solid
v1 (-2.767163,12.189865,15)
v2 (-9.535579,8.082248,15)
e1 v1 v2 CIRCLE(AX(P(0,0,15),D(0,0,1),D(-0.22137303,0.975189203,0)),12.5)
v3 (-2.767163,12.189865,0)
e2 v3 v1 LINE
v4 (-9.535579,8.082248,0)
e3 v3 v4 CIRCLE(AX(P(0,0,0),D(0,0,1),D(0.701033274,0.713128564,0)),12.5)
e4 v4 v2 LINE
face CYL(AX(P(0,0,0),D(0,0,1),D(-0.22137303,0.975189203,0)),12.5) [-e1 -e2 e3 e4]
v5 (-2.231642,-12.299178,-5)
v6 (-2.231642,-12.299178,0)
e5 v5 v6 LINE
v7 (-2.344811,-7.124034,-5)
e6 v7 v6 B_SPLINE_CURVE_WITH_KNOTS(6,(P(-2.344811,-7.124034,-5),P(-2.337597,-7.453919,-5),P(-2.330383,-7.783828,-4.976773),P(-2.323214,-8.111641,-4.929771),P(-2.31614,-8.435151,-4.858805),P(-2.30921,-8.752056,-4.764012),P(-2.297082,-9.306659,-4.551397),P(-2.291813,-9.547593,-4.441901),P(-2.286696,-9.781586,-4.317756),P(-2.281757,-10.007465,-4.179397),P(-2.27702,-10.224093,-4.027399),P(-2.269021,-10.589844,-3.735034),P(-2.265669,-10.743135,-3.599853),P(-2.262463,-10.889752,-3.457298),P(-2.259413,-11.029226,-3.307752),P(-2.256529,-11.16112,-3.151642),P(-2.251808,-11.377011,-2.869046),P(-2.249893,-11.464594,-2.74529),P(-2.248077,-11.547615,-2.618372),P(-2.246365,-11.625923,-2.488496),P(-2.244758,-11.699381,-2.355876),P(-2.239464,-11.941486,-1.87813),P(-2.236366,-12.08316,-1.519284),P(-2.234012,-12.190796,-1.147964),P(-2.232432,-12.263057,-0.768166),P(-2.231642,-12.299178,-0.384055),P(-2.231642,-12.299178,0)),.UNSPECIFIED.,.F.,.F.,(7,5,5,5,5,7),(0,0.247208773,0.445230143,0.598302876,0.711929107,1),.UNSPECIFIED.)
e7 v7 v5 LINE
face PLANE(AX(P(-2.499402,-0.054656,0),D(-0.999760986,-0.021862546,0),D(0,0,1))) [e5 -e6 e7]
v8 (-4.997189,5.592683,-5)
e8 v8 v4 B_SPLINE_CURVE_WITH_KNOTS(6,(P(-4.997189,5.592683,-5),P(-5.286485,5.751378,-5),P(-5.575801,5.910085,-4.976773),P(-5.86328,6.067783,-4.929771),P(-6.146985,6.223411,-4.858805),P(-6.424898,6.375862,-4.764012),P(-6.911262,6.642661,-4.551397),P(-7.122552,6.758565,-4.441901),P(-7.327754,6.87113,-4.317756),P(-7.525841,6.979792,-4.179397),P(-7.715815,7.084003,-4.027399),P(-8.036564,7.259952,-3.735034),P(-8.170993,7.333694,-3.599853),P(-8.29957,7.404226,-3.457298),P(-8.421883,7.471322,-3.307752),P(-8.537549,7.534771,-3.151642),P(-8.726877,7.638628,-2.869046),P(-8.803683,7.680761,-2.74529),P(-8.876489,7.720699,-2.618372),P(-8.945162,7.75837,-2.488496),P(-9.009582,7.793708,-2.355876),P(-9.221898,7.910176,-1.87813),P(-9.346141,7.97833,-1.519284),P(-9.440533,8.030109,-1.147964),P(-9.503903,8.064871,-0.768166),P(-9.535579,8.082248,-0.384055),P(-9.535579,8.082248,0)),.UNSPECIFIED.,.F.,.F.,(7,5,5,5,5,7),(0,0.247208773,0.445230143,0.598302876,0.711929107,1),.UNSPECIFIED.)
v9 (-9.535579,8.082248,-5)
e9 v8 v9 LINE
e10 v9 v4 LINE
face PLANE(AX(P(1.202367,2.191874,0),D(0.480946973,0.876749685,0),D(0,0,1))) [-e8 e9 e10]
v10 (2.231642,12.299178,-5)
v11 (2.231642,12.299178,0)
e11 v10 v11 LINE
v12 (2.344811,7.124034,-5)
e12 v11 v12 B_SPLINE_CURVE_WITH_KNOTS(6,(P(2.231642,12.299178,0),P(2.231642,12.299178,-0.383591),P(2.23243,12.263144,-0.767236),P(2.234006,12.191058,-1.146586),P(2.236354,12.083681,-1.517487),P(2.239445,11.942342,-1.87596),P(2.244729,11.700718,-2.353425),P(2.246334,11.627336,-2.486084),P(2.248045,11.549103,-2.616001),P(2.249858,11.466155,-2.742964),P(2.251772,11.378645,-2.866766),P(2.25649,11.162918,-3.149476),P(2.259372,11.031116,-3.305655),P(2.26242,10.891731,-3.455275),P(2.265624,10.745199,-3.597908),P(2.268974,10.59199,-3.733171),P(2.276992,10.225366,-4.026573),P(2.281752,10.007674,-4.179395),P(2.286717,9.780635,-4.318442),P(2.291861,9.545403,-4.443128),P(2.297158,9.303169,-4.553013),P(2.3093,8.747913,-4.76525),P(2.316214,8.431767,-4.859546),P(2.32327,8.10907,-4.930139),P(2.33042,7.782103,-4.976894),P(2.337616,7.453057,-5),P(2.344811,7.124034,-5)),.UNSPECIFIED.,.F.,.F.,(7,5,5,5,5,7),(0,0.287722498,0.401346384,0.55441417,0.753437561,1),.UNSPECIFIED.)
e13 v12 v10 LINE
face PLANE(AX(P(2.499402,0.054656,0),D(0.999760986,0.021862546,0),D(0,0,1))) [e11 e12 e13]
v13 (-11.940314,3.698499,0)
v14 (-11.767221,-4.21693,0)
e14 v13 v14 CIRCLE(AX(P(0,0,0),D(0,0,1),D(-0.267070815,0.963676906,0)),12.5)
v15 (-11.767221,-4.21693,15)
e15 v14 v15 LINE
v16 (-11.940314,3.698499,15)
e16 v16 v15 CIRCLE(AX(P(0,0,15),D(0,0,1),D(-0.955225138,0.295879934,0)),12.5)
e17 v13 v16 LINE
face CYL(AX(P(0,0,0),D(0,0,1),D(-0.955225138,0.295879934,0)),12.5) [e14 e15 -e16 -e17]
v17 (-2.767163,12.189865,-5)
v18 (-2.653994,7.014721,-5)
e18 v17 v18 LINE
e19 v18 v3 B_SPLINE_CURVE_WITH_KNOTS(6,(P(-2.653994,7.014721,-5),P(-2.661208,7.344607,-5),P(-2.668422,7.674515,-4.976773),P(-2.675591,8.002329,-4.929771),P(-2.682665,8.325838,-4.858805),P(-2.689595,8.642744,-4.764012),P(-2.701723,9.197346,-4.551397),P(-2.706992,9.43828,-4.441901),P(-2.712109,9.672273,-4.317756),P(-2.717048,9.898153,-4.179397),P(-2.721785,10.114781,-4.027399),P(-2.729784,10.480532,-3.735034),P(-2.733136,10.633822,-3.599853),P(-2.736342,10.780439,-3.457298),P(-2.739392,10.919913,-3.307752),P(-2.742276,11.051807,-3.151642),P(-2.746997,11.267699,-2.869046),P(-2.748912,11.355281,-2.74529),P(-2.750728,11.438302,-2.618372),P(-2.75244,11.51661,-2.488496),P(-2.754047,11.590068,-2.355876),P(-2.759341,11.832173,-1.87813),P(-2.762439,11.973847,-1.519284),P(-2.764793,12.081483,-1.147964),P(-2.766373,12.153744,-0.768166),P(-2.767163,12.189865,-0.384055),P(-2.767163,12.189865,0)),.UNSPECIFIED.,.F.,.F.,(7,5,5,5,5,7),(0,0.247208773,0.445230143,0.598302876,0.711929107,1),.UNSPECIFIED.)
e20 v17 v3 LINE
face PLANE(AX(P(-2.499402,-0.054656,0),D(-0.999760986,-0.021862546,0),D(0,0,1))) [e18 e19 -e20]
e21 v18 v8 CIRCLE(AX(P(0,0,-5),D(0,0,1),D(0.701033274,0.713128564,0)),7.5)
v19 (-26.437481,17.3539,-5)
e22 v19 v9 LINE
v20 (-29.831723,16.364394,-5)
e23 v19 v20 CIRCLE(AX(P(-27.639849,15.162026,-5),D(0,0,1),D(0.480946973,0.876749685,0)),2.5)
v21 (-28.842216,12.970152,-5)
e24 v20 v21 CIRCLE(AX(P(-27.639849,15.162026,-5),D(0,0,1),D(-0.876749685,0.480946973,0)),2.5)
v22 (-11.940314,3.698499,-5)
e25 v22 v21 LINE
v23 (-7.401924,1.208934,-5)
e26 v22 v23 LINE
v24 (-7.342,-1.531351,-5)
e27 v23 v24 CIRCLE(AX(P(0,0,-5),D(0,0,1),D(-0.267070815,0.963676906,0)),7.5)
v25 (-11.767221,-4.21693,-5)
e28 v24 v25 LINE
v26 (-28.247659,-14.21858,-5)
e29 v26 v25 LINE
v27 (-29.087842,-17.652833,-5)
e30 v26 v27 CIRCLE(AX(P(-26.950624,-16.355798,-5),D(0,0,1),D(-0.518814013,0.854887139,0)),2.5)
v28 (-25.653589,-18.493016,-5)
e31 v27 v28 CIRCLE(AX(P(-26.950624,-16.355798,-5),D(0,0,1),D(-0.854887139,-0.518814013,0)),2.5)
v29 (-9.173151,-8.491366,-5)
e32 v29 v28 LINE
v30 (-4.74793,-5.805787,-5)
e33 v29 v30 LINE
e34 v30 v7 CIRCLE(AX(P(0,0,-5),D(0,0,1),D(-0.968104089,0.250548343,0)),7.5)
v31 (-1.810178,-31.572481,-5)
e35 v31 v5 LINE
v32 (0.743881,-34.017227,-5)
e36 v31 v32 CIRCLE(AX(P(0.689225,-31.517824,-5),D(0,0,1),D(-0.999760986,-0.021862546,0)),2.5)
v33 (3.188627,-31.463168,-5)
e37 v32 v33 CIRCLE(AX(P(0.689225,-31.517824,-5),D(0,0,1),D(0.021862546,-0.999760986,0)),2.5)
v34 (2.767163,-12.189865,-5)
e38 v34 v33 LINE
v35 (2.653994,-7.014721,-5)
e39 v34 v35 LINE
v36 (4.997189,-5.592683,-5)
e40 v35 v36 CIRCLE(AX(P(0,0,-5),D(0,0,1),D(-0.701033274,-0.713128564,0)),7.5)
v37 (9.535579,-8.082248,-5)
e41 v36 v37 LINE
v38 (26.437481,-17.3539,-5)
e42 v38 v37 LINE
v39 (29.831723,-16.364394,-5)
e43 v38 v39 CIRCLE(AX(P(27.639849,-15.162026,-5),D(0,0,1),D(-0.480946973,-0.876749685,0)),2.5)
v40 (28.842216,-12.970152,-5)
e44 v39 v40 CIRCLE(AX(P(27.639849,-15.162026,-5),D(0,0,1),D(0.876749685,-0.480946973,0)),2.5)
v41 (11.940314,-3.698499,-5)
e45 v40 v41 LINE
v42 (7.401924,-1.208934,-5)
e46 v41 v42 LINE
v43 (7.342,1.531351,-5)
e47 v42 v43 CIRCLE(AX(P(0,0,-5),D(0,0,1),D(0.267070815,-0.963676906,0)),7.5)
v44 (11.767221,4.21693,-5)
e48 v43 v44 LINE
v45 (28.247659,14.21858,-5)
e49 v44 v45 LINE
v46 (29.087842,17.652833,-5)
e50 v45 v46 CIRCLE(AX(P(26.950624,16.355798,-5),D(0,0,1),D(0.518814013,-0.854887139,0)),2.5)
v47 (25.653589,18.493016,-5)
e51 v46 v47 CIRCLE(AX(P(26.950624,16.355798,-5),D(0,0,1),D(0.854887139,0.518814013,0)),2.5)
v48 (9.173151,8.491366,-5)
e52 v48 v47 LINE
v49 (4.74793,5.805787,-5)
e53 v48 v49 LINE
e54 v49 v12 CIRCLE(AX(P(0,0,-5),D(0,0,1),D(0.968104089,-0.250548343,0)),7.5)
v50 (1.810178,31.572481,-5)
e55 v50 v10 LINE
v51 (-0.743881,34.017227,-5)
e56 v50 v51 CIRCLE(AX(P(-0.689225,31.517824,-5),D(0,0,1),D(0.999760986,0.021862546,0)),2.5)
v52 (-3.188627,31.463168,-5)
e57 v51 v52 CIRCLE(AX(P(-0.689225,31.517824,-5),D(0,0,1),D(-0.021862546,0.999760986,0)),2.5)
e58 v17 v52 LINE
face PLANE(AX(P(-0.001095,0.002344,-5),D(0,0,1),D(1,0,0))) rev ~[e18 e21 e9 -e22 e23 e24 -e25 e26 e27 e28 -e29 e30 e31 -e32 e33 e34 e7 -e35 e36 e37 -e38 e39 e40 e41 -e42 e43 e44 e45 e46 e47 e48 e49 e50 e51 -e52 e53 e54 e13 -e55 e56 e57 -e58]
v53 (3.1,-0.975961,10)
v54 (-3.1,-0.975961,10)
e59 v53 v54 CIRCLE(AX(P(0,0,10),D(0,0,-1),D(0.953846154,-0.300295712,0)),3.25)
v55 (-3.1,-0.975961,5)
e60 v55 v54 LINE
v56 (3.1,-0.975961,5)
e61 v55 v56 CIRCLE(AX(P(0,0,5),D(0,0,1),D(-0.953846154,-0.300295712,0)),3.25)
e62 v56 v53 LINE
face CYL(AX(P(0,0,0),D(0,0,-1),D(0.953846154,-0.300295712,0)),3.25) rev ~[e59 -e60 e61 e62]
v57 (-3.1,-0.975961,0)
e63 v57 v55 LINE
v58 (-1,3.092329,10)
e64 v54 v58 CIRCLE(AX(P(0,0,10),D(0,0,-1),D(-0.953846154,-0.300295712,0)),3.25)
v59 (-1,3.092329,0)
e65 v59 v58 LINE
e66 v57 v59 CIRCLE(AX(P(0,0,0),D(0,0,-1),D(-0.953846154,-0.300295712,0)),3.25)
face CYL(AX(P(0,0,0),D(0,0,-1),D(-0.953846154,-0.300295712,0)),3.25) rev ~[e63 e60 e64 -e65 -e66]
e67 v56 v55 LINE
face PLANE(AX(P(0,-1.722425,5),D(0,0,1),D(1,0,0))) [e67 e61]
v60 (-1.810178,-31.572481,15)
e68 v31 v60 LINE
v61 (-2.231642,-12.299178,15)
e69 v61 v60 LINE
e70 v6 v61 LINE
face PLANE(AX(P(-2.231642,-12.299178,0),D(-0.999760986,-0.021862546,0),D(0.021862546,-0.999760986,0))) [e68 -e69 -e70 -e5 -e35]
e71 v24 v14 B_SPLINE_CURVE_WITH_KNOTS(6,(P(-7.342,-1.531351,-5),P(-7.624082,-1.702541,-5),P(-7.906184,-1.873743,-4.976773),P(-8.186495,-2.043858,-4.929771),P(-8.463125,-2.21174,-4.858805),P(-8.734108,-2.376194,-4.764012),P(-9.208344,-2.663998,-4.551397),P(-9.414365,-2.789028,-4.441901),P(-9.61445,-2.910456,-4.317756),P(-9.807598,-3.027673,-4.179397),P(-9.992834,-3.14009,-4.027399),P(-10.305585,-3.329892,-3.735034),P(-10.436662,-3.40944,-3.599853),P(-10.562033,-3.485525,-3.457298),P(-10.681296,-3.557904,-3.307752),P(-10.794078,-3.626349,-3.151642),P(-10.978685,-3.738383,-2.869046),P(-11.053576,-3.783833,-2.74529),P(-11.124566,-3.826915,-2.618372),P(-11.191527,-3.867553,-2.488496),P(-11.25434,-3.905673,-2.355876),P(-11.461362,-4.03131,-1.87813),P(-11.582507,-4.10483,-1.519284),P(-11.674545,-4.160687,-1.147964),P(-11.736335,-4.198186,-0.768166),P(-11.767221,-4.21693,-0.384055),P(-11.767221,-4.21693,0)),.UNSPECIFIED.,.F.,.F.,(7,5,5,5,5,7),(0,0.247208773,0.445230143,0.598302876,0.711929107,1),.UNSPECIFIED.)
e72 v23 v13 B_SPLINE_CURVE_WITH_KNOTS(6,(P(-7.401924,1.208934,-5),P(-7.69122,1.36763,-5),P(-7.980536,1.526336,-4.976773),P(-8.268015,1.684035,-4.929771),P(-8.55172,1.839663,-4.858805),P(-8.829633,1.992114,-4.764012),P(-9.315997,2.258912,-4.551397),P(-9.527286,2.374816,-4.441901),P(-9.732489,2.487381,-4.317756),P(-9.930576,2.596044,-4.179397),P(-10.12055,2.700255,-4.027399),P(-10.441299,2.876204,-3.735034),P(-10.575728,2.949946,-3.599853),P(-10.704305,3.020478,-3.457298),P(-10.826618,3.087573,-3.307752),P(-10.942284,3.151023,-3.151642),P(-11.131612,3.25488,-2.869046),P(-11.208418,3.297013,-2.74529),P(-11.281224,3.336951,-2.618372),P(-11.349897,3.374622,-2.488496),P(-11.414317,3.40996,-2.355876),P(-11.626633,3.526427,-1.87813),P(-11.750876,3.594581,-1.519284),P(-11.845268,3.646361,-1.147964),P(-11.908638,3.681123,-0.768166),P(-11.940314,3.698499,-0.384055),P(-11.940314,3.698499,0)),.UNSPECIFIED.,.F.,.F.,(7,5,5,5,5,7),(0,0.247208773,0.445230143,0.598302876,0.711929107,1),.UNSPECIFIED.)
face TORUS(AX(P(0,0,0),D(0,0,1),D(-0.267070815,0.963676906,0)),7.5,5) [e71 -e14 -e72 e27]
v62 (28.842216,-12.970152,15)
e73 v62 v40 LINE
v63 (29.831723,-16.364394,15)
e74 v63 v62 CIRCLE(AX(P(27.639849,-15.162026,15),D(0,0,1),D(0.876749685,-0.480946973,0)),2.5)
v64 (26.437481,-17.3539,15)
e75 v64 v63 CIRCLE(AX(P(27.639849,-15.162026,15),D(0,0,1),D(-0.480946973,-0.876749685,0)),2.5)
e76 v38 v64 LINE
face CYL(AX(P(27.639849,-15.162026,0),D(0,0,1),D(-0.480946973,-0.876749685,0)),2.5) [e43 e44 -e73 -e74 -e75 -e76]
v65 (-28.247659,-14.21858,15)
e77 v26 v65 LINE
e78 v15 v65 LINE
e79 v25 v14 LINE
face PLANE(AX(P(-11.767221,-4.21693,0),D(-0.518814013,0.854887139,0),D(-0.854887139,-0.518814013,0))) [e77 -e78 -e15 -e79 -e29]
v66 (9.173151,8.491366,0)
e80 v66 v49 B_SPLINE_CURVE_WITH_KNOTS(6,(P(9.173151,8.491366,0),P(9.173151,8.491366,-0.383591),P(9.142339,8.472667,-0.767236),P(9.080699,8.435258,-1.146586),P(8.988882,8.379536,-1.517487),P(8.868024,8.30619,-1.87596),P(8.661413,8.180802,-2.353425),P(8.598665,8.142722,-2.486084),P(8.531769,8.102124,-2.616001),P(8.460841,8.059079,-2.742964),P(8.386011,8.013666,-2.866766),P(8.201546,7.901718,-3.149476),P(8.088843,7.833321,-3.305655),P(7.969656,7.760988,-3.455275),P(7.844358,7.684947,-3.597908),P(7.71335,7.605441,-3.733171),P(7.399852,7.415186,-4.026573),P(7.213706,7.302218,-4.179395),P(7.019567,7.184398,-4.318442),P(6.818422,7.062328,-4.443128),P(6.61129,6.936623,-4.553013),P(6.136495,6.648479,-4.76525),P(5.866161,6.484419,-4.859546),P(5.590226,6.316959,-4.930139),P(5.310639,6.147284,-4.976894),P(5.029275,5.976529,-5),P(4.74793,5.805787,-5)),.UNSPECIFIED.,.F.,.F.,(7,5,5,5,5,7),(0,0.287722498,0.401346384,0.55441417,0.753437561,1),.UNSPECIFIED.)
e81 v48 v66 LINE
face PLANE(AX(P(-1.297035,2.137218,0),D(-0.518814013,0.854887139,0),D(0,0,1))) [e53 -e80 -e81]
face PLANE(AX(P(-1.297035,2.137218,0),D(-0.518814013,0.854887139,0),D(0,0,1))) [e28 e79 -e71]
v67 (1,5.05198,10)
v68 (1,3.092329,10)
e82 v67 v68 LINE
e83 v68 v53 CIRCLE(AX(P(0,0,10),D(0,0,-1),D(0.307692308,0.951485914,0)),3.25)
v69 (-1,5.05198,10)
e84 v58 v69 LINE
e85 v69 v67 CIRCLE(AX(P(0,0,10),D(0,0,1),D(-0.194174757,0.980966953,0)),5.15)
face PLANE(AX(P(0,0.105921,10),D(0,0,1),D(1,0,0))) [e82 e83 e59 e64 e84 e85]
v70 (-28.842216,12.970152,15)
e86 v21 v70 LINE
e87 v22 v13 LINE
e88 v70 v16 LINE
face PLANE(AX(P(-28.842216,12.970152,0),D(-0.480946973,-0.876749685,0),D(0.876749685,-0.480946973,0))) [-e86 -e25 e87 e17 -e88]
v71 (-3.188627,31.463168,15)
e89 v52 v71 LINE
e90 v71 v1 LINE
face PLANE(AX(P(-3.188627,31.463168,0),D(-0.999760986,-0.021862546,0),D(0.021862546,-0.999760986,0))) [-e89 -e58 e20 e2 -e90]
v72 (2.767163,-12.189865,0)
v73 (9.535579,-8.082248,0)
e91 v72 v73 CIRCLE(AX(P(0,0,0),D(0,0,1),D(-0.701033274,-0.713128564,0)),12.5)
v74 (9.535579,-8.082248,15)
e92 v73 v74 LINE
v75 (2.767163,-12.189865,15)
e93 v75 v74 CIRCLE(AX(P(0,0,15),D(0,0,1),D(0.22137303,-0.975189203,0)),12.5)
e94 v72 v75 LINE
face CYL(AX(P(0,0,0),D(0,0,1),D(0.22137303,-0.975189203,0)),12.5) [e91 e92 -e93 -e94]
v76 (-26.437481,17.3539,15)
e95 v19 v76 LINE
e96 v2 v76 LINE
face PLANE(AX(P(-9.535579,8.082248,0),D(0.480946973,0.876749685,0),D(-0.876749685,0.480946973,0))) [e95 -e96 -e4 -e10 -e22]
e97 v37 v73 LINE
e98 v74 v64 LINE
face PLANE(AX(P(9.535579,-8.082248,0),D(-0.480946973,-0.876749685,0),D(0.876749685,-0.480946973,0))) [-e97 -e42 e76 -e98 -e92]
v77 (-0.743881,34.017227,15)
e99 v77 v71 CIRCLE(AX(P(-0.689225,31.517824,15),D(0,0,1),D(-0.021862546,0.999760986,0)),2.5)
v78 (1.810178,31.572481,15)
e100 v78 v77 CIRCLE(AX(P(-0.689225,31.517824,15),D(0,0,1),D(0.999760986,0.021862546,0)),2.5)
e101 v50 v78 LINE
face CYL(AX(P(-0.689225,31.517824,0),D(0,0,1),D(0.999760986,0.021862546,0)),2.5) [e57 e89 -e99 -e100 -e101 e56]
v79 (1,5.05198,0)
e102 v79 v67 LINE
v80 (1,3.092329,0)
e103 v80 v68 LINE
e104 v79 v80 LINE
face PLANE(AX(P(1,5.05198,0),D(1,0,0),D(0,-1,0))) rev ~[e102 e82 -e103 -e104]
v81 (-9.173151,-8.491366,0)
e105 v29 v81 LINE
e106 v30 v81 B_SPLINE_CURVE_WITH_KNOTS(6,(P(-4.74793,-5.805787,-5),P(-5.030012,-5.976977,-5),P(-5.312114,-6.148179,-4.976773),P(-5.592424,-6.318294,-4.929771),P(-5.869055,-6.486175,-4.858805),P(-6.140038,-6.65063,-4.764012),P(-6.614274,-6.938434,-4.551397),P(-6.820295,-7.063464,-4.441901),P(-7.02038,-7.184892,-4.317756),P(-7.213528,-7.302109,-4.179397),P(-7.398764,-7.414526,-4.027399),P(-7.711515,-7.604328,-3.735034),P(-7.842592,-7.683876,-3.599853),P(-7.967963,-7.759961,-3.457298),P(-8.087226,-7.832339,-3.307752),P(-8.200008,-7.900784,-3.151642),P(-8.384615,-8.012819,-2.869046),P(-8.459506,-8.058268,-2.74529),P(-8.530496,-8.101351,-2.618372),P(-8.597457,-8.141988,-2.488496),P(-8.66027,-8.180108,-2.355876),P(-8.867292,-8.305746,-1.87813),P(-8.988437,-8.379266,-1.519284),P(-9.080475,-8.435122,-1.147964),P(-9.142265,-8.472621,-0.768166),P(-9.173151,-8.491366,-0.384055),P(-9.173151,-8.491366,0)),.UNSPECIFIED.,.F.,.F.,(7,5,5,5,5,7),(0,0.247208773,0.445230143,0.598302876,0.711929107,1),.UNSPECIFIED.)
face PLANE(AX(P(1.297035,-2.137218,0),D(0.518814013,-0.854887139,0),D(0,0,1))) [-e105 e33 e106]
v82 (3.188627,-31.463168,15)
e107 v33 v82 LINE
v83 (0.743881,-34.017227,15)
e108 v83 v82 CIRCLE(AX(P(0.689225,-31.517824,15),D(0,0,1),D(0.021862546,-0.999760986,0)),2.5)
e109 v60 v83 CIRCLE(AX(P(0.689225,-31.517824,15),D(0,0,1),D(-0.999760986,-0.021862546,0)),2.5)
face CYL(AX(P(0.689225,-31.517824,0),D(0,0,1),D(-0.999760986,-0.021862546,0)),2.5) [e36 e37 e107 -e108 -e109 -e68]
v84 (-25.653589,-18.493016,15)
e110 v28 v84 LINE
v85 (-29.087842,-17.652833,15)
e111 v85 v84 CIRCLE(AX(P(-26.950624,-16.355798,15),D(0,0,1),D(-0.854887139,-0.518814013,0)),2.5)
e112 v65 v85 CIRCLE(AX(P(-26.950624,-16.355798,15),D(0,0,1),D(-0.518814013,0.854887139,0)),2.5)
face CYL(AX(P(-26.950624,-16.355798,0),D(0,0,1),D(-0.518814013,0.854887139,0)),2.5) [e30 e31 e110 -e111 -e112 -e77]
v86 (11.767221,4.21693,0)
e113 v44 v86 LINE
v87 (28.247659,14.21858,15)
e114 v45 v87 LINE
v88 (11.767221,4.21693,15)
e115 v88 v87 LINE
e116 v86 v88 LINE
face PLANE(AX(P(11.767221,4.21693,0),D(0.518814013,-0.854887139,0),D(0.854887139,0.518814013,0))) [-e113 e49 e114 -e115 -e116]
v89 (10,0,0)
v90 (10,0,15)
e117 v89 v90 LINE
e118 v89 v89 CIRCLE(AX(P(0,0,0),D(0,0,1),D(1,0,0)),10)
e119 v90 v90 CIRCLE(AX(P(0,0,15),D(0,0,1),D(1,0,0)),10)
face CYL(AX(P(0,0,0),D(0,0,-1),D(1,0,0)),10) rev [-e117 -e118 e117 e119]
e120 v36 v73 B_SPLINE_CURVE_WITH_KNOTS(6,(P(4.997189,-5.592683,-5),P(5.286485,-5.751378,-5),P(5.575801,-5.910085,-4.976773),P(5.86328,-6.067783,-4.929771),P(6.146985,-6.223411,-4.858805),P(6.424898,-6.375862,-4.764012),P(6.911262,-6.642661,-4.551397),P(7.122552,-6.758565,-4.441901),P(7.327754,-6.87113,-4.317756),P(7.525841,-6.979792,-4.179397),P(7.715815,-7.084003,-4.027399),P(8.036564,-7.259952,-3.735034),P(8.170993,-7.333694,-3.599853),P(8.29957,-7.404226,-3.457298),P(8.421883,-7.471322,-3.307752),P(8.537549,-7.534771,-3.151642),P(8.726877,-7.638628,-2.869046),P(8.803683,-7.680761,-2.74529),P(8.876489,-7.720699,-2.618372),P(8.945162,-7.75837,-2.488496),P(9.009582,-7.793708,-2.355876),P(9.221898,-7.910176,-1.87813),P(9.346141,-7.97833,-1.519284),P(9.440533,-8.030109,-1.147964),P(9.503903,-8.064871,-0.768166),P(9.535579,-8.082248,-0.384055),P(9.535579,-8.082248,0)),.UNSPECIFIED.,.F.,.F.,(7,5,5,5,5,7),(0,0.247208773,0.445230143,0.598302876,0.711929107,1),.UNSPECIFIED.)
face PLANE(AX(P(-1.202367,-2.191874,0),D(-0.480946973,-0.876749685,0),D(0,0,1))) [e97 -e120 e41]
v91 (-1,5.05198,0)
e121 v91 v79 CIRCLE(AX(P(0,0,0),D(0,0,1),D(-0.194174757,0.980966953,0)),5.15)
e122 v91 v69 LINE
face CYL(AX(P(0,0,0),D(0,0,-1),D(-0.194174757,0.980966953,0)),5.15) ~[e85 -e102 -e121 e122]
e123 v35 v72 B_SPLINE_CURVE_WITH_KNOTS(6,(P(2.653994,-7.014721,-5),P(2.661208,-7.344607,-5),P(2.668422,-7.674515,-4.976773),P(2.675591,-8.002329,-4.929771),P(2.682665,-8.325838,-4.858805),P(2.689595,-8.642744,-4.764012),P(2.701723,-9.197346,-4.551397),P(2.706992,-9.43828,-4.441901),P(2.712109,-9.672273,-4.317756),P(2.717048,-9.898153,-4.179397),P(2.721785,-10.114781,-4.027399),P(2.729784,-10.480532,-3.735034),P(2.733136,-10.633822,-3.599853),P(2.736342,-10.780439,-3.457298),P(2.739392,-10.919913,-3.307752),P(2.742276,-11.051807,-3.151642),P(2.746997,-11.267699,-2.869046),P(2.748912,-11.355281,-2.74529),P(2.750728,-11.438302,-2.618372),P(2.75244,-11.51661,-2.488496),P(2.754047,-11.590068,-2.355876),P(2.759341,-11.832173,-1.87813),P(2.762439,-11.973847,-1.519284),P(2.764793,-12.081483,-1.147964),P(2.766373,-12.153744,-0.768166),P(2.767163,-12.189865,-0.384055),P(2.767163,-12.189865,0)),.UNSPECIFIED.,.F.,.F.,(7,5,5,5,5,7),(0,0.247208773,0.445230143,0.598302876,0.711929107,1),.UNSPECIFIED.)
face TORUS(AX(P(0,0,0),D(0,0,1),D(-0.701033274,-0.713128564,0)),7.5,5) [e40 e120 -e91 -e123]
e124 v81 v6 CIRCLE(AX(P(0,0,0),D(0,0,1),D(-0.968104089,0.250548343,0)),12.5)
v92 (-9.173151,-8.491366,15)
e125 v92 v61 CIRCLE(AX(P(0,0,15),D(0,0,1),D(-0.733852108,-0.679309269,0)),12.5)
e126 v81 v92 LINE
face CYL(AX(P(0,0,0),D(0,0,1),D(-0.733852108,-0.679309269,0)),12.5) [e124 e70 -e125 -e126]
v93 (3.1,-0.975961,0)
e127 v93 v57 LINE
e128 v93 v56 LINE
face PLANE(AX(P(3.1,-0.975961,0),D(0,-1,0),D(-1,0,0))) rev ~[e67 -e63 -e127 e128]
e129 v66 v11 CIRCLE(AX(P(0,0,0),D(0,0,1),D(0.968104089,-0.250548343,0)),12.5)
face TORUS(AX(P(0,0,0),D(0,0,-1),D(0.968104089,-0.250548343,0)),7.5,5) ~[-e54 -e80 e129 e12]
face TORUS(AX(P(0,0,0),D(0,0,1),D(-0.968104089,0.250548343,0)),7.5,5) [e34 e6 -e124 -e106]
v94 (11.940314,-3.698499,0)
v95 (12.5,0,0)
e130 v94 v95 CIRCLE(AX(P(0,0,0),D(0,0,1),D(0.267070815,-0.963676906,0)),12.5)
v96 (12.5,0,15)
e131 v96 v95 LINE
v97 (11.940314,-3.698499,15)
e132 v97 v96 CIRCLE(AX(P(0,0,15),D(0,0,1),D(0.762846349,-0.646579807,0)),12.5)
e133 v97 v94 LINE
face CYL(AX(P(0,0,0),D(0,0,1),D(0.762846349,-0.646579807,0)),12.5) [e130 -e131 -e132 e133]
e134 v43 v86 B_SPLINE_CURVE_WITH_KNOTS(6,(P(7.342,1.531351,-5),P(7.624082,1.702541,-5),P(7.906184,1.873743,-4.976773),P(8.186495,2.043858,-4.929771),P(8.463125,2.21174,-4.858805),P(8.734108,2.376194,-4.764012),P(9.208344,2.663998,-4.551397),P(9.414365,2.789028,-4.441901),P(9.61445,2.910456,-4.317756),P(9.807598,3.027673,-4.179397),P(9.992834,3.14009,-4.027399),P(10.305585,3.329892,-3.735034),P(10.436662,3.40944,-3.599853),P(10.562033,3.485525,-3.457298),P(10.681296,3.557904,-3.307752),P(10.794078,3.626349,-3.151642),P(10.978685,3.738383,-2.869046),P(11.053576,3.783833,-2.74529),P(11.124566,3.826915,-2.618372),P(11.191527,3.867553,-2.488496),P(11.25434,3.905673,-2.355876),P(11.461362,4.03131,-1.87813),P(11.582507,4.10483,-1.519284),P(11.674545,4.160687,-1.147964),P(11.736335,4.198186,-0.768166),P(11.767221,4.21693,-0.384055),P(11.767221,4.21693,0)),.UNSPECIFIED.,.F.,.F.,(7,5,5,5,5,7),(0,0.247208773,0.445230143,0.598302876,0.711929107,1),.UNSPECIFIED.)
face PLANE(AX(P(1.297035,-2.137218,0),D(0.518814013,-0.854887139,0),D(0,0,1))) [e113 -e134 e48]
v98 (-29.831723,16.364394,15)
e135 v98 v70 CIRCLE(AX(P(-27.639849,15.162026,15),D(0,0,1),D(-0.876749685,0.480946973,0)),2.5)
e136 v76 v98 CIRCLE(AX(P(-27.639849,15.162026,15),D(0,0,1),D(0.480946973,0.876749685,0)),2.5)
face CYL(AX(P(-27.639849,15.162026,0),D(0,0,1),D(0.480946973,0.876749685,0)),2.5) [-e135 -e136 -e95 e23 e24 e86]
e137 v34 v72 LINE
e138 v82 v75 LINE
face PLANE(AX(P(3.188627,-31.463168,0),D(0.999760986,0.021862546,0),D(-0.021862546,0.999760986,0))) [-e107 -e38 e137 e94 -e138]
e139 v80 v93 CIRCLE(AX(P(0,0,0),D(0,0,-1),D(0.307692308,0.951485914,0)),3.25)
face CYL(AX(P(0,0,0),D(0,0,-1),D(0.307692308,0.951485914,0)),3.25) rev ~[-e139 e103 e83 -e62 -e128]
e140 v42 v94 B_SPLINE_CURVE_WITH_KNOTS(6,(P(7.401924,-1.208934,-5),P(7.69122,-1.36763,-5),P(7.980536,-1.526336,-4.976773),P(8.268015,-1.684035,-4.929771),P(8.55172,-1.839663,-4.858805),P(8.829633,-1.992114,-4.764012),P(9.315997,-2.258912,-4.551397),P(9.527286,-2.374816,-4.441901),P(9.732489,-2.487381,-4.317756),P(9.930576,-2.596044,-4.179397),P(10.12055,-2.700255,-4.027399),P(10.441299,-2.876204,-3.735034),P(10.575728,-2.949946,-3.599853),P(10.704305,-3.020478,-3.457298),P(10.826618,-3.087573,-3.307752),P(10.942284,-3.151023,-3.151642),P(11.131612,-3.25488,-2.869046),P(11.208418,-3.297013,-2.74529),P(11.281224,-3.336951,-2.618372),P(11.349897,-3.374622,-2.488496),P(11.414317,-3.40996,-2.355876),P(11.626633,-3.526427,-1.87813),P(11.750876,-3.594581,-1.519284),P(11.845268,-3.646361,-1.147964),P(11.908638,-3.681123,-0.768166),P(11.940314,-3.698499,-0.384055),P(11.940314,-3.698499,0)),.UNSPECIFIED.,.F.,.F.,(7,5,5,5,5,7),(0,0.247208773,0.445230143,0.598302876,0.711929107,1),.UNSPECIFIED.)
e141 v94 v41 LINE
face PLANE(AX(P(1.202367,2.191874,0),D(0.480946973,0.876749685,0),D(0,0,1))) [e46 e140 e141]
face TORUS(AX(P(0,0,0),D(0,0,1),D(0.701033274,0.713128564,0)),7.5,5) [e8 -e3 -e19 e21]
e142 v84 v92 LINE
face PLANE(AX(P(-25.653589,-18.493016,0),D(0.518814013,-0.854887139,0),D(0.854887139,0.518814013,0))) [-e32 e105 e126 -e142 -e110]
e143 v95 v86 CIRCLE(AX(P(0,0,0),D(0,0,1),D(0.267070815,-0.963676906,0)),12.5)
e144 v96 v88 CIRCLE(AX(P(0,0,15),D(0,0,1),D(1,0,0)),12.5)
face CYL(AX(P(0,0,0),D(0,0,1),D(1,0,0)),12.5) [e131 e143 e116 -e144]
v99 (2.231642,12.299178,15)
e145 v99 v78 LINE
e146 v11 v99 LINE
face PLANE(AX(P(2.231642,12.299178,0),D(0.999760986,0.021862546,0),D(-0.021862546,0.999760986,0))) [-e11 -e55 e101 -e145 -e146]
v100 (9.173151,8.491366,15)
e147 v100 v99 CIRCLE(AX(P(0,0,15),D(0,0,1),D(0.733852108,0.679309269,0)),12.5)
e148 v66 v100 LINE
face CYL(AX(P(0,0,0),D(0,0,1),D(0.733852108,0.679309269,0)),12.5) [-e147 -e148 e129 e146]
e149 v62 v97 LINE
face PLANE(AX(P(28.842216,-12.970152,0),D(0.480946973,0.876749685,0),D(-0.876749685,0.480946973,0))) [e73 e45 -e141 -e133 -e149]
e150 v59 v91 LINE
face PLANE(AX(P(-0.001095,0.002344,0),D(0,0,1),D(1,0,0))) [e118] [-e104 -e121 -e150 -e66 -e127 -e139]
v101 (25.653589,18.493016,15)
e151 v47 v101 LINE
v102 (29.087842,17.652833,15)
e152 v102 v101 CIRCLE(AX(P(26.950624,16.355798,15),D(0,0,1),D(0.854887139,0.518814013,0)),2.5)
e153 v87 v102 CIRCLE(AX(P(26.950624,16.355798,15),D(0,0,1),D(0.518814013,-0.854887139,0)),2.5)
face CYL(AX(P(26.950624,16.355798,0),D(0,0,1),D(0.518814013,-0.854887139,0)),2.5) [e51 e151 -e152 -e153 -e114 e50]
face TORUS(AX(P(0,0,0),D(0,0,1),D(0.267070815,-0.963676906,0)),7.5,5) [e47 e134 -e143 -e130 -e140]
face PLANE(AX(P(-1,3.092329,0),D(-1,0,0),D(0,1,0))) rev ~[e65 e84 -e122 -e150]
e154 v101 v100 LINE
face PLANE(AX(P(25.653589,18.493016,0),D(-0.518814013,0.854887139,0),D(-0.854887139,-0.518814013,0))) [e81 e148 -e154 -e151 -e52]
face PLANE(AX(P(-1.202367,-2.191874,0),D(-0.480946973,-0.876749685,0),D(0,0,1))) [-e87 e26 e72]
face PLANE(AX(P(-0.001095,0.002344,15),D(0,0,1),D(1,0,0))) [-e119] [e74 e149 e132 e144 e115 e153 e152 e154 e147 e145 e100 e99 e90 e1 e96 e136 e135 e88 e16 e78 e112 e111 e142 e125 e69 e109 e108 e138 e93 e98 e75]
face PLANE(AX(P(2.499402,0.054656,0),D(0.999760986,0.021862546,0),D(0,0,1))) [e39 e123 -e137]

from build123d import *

# Parameters (mm, degrees)
F1_DEPTH     = 10
F2_DEPTH     = 5
F0_R         = 10
F3_DEPTH     = 15
F4_DEPTH     = 5
F6_T4_ANGLE  = 151.525388132
F6_T10_ANGLE = 151.525388132
F6_T16_ANGLE = 151.525388132
F6_T22_ANGLE = 151.525388132
F6_T28_ANGLE = 151.525388132
F6_T34_ANGLE = 151.525388132


# Not quite as in the source:
# - a fillet or chamfer that OpenCascade refuses, or shapes differently, is made with other operations: its cross-section is extruded or revolved along the edge and cut away or added
# - a feature of the source that left no trace in its solid (it failed there, or was rolled back) is left out


with BuildPart() as f1:
    # F0 (on Top) → F1 (new body)
    with BuildSketch(Plane.XY):
        with BuildLine():
            ThreePointArc((-3.1, -0.9759610648), (-2.8879484862, 1.4907224897), (-1, 3.0923292192))
            Line((-1, 3.0923292192), (-1, 5.0519798099))
            ThreePointArc((-1, 5.0519798099), (0, -5.15), (1, 5.0519798099))
            Line((1, 5.0519798099), (1, 3.0923292192))
            ThreePointArc((1, 3.0923292192), (2.8879484862, 1.4907224897), (3.1, -0.9759610648))
            ThreePointArc((3.1, -0.9759610648), (0, -3.25), (-3.1, -0.9759610648))
        make_face()
    extrude(amount=F1_DEPTH)

    # F0 (on Top) → F2 (join)
    with BuildSketch(Plane.XY):
        with BuildLine():
            Line((3.1, -0.9759610648), (-3.1, -0.9759610648))
            ThreePointArc((-3.1, -0.9759610648), (0, -3.25), (3.1, -0.9759610648))
        make_face()
    extrude(amount=F2_DEPTH)



with BuildPart() as f3:
    # F0 (on Top) → F3 (new body)
    with BuildSketch(Plane.XY):
        with BuildLine():
            ThreePointArc((11.940314229, -3.6984991703), (12.3592865462, -1.870303737), (12.5, 0))
            ThreePointArc((12.5, 0), (12.3154429017, 2.1400621802), (11.7672214184, 4.2169301738))
            ThreePointArc((11.7672214184, 4.2169301738), (10.6860892314, 6.4851751664), (9.1731513519, 8.4913658663))
            ThreePointArc((9.1731513519, 8.4913658663), (6.0118371583, 10.9593710578), (2.2316420527, 12.2991777672))
            ThreePointArc((2.2316420527, 12.2991777672), (-0.2732818264, 12.4970123247), (-2.7671628772, 12.1898650366))
            ThreePointArc((-2.7671628772, 12.1898650366), (-6.4851751664, 10.6860892314), (-9.5355793657, 8.0822475934))
            ThreePointArc((-9.5355793657, 8.0822475934), (-10.9593710578, 6.0118371583), (-11.940314229, 3.6984991703))
            ThreePointArc((-11.940314229, 3.6984991703), (-12.4970123247, -0.2732818264), (-11.7672214184, -4.2169301738))
            ThreePointArc((-11.7672214184, -4.2169301738), (-10.6860892314, -6.4851751664), (-9.1731513519, -8.4913658663))
            ThreePointArc((-9.1731513519, -8.4913658663), (-6.0118371583, -10.9593710578), (-2.2316420527, -12.2991777672))
            ThreePointArc((-2.2316420527, -12.2991777672), (0.2732818264, -12.4970123247), (2.7671628772, -12.1898650366))
            ThreePointArc((2.7671628772, -12.1898650366), (6.4851751664, -10.6860892314), (9.5355793657, -8.0822475934))
            ThreePointArc((9.5355793657, -8.0822475934), (10.9593710578, -6.0118371583), (11.940314229, -3.6984991703))
        make_face()
        Circle(F0_R, mode=Mode.SUBTRACT)
        with BuildLine():
            ThreePointArc((9.1731513519, 8.4913658663), (10.6860892314, 6.4851751664), (11.7672214184, 4.2169301738))
            Line((11.7672214184, 4.2169301738), (28.2476592825, 14.2185803615))
            ThreePointArc((28.2476592825, 14.2185803615), (29.3790077487, 15.7616992433), (29.0878420955, 17.652833241))
            ThreePointArc((29.0878420955, 17.652833241), (27.5447232138, 18.7841817072), (25.653589216, 18.4930160541))
            Line((25.653589216, 18.4930160541), (9.1731513519, 8.4913658663))
        make_face()
        with BuildLine():
            ThreePointArc((-2.7671628772, 12.1898650366), (-0.2732818264, 12.4970123247), (2.2316420527, 12.2991777672))
            Line((2.2316420527, 12.2991777672), (1.8101778425, 31.5724807169))
            ThreePointArc((1.8101778425, 31.5724807169), (1.0394719229, 33.32381667), (-0.7438809877, 34.0172268165))
            ThreePointArc((-0.7438809877, 34.0172268165), (-2.4952169409, 33.246520897), (-3.1886270874, 31.4631679863))
            Line((-3.1886270874, 31.4631679863), (-2.7671628772, 12.1898650366))
        make_face()
        with BuildLine():
            ThreePointArc((-11.940314229, 3.6984991703), (-10.9593710578, 6.0118371583), (-9.5355793657, 8.0822475934))
            Line((-9.5355793657, 8.0822475934), (-26.4374814401, 17.3539003554))
            ThreePointArc((-26.4374814401, 17.3539003554), (-28.3395358258, 17.5621174267), (-29.8317230833, 16.3643935755))
            ThreePointArc((-29.8317230833, 16.3643935755), (-30.0399401546, 14.4623391897), (-28.8422163034, 12.9701519323))
            Line((-28.8422163034, 12.9701519323), (-11.940314229, 3.6984991703))
        make_face()
        with BuildLine():
            Line((-25.653589216, -18.4930160541), (-9.1731513519, -8.4913658663))
            ThreePointArc((-9.1731513519, -8.4913658663), (-10.6860892314, -6.4851751664), (-11.7672214184, -4.2169301738))
            Line((-11.7672214184, -4.2169301738), (-28.2476592825, -14.2185803615))
            ThreePointArc((-28.2476592825, -14.2185803615), (-29.3790077487, -15.7616992433), (-29.0878420955, -17.652833241))
            ThreePointArc((-29.0878420955, -17.652833241), (-27.5447232138, -18.7841817072), (-25.653589216, -18.4930160541))
        make_face()
        with BuildLine():
            Line((3.1886270874, -31.4631679863), (2.7671628772, -12.1898650366))
            ThreePointArc((2.7671628772, -12.1898650366), (0.2732818264, -12.4970123247), (-2.2316420527, -12.2991777672))
            Line((-2.2316420527, -12.2991777672), (-1.8101778425, -31.5724807169))
            ThreePointArc((-1.8101778425, -31.5724807169), (-1.0394719229, -33.32381667), (0.7438809877, -34.0172268165))
            ThreePointArc((0.7438809877, -34.0172268165), (2.4952169409, -33.246520897), (3.1886270874, -31.4631679863))
        make_face()
        with BuildLine():
            Line((28.8422163034, -12.9701519323), (11.940314229, -3.6984991703))
            ThreePointArc((11.940314229, -3.6984991703), (10.9593710578, -6.0118371583), (9.5355793657, -8.0822475934))
            Line((9.5355793657, -8.0822475934), (26.4374814401, -17.3539003554))
            ThreePointArc((26.4374814401, -17.3539003554), (28.3395358258, -17.5621174267), (29.8317230833, -16.3643935755))
            ThreePointArc((29.8317230833, -16.3643935755), (30.0399401546, -14.4623391897), (28.8422163034, -12.9701519323))
        make_face()
    extrude(amount=F3_DEPTH)


with BuildPart() as f1_1:
    add(f1.part)

    add(f3.part)  # F4 merges F3
    # F0 (on Top) → F4 (join)
    with BuildSketch(Plane.XY):
        with BuildLine():
            ThreePointArc((11.940314229, -3.6984991703), (12.3592865462, -1.870303737), (12.5, 0))
            ThreePointArc((12.5, 0), (12.3154429017, 2.1400621802), (11.7672214184, 4.2169301738))
            ThreePointArc((11.7672214184, 4.2169301738), (10.6860892314, 6.4851751664), (9.1731513519, 8.4913658663))
            ThreePointArc((9.1731513519, 8.4913658663), (6.0118371583, 10.9593710578), (2.2316420527, 12.2991777672))
            ThreePointArc((2.2316420527, 12.2991777672), (-0.2732818264, 12.4970123247), (-2.7671628772, 12.1898650366))
            ThreePointArc((-2.7671628772, 12.1898650366), (-6.4851751664, 10.6860892314), (-9.5355793657, 8.0822475934))
            ThreePointArc((-9.5355793657, 8.0822475934), (-10.9593710578, 6.0118371583), (-11.940314229, 3.6984991703))
            ThreePointArc((-11.940314229, 3.6984991703), (-12.4970123247, -0.2732818264), (-11.7672214184, -4.2169301738))
            ThreePointArc((-11.7672214184, -4.2169301738), (-10.6860892314, -6.4851751664), (-9.1731513519, -8.4913658663))
            ThreePointArc((-9.1731513519, -8.4913658663), (-6.0118371583, -10.9593710578), (-2.2316420527, -12.2991777672))
            ThreePointArc((-2.2316420527, -12.2991777672), (0.2732818264, -12.4970123247), (2.7671628772, -12.1898650366))
            ThreePointArc((2.7671628772, -12.1898650366), (6.4851751664, -10.6860892314), (9.5355793657, -8.0822475934))
            ThreePointArc((9.5355793657, -8.0822475934), (10.9593710578, -6.0118371583), (11.940314229, -3.6984991703))
        make_face()
        Circle(F0_R, mode=Mode.SUBTRACT)
        with BuildLine():
            ThreePointArc((9.1731513519, 8.4913658663), (10.6860892314, 6.4851751664), (11.7672214184, 4.2169301738))
            Line((11.7672214184, 4.2169301738), (28.2476592825, 14.2185803615))
            ThreePointArc((28.2476592825, 14.2185803615), (29.3790077487, 15.7616992433), (29.0878420955, 17.652833241))
            ThreePointArc((29.0878420955, 17.652833241), (27.5447232138, 18.7841817072), (25.653589216, 18.4930160541))
            Line((25.653589216, 18.4930160541), (9.1731513519, 8.4913658663))
        make_face()
        with BuildLine():
            Line((28.8422163034, -12.9701519323), (11.940314229, -3.6984991703))
            ThreePointArc((11.940314229, -3.6984991703), (10.9593710578, -6.0118371583), (9.5355793657, -8.0822475934))
            Line((9.5355793657, -8.0822475934), (26.4374814401, -17.3539003554))
            ThreePointArc((26.4374814401, -17.3539003554), (28.3395358258, -17.5621174267), (29.8317230833, -16.3643935755))
            ThreePointArc((29.8317230833, -16.3643935755), (30.0399401546, -14.4623391897), (28.8422163034, -12.9701519323))
        make_face()
        with BuildLine():
            ThreePointArc((-2.7671628772, 12.1898650366), (-0.2732818264, 12.4970123247), (2.2316420527, 12.2991777672))
            Line((2.2316420527, 12.2991777672), (1.8101778425, 31.5724807169))
            ThreePointArc((1.8101778425, 31.5724807169), (1.0394719229, 33.32381667), (-0.7438809877, 34.0172268165))
            ThreePointArc((-0.7438809877, 34.0172268165), (-2.4952169409, 33.246520897), (-3.1886270874, 31.4631679863))
            Line((-3.1886270874, 31.4631679863), (-2.7671628772, 12.1898650366))
        make_face()
        with BuildLine():
            Line((3.1886270874, -31.4631679863), (2.7671628772, -12.1898650366))
            ThreePointArc((2.7671628772, -12.1898650366), (0.2732818264, -12.4970123247), (-2.2316420527, -12.2991777672))
            Line((-2.2316420527, -12.2991777672), (-1.8101778425, -31.5724807169))
            ThreePointArc((-1.8101778425, -31.5724807169), (-1.0394719229, -33.32381667), (0.7438809877, -34.0172268165))
            ThreePointArc((0.7438809877, -34.0172268165), (2.4952169409, -33.246520897), (3.1886270874, -31.4631679863))
        make_face()
        with BuildLine():
            ThreePointArc((-11.940314229, 3.6984991703), (-10.9593710578, 6.0118371583), (-9.5355793657, 8.0822475934))
            Line((-9.5355793657, 8.0822475934), (-26.4374814401, 17.3539003554))
            ThreePointArc((-26.4374814401, 17.3539003554), (-28.3395358258, 17.5621174267), (-29.8317230833, 16.3643935755))
            ThreePointArc((-29.8317230833, 16.3643935755), (-30.0399401546, 14.4623391897), (-28.8422163034, 12.9701519323))
            Line((-28.8422163034, 12.9701519323), (-11.940314229, 3.6984991703))
        make_face()
        with BuildLine():
            Line((-25.653589216, -18.4930160541), (-9.1731513519, -8.4913658663))
            ThreePointArc((-9.1731513519, -8.4913658663), (-10.6860892314, -6.4851751664), (-11.7672214184, -4.2169301738))
            Line((-11.7672214184, -4.2169301738), (-28.2476592825, -14.2185803615))
            ThreePointArc((-28.2476592825, -14.2185803615), (-29.3790077487, -15.7616992433), (-29.0878420955, -17.652833241))
            ThreePointArc((-29.0878420955, -17.652833241), (-27.5447232138, -18.7841817072), (-25.653589216, -18.4930160541))
        make_face()
        Circle(F0_R)
        with BuildLine():
            Line((-1, 5.0519798099), (-1, 3.0923292192))
            ThreePointArc((-1, 3.0923292192), (-2.8879484862, 1.4907224897), (-3.1, -0.9759610648))
            Line((-3.1, -0.9759610648), (3.1, -0.9759610648))
            ThreePointArc((3.1, -0.9759610648), (2.8879484862, 1.4907224897), (1, 3.0923292192))
            Line((1, 3.0923292192), (1, 5.0519798099))
            ThreePointArc((1, 5.0519798099), (0, -5.15), (-1, 5.0519798099))
        make_face(mode=Mode.SUBTRACT)
        with BuildLine():
            Line((3.1, -0.9759610648), (-3.1, -0.9759610648))
            ThreePointArc((-3.1, -0.9759610648), (0, -3.25), (3.1, -0.9759610648))
        make_face()
        with BuildLine():
            ThreePointArc((-3.1, -0.9759610648), (-2.8879484862, 1.4907224897), (-1, 3.0923292192))
            Line((-1, 3.0923292192), (-1, 5.0519798099))
            ThreePointArc((-1, 5.0519798099), (0, -5.15), (1, 5.0519798099))
            Line((1, 5.0519798099), (1, 3.0923292192))
            ThreePointArc((1, 3.0923292192), (2.8879484862, 1.4907224897), (3.1, -0.9759610648))
            ThreePointArc((3.1, -0.9759610648), (0, -3.25), (-3.1, -0.9759610648))
        make_face()
    extrude(amount=-F4_DEPTH)

    # F6: fillet of radius 5 on 6 edges, made by hand


with BuildPart() as f6_tool2:
    # F6_s3 → F6_t4 (revolve)
    with BuildSketch(Plane(origin=(0, 0, 0), x_dir=(0, 0, 1), z_dir=(0.9636769063, 0.2670708152, 0))):
        with BuildLine():
            ThreePointArc((-5, -7.5), (-3.5355339059, -11.0355339059), (0, -12.5))
            Line((0, -12.5), (0, -12.6))
            Line((0, -12.6), (-5.1, -12.6))
            Line((-5.1, -12.6), (-5.1, -7.5))
            Line((-5.1, -7.5), (-5, -7.5))
        make_face()
    revolve(axis=Axis((0, 0, -5), (0, 0, 1)), revolution_arc=F6_T4_ANGLE)

    split(bisect_by=Plane(origin=(-1.2023674317, -2.1918742116, 0), x_dir=(0, 0, 1), z_dir=(-0.4809469727, -0.8767496846, 0)), keep=Keep.TOP)

    split(bisect_by=Plane(origin=(-1.2970350333, 2.1372178463, 0), x_dir=(0, 0, 1), z_dir=(-0.5188140133, 0.8548871385, 0)), keep=Keep.TOP)


with BuildPart() as f1_2:
    add(f1_1.part)

    # F6_t1: cut F6_tool2
    add(f6_tool2.part, mode=Mode.SUBTRACT)


with BuildPart() as f6_tool8:
    # F6_s9 → F6_t10 (revolve)
    with BuildSketch(Plane(origin=(0, 0, 0), x_dir=(0, 0, 1), z_dir=(-0.2505483426, -0.9681040895, 0))):
        with BuildLine():
            ThreePointArc((0, -12.5), (-3.5355339059, -11.0355339059), (-5, -7.5))
            Line((-5, -7.5), (-5.1, -7.5))
            Line((-5.1, -7.5), (-5.1, -12.6))
            Line((-5.1, -12.6), (0, -12.6))
            Line((0, -12.6), (0, -12.5))
        make_face()
    revolve(axis=Axis((0, 0, -5), (0, 0, 1)), revolution_arc=F6_T10_ANGLE)

    split(bisect_by=Plane(origin=(-1.2970350333, 2.1372178463, 0), x_dir=(0, 0, 1), z_dir=(-0.5188140133, 0.8548871385, 0)), keep=Keep.TOP)

    split(bisect_by=Plane(origin=(2.4994024649, 0.0546563653, 0), x_dir=(0, 0, 1), z_dir=(0.999760986, 0.0218625461, 0)), keep=Keep.TOP)


with BuildPart() as f1_3:
    add(f1_2.part)

    # F6_t7: cut F6_tool8
    add(f6_tool8.part, mode=Mode.SUBTRACT)


with BuildPart() as f6_tool14:
    # F6_s15 → F6_t16 (revolve)
    with BuildSketch(Plane(origin=(0, 0, 0), x_dir=(0, 0, 1), z_dir=(0.7131285637, -0.7010332743, 0))):
        with BuildLine():
            ThreePointArc((-5, -7.5), (-3.5355339059, -11.0355339059), (0, -12.5))
            Line((0, -12.5), (0, -12.6))
            Line((0, -12.6), (-5.1, -12.6))
            Line((-5.1, -12.6), (-5.1, -7.5))
            Line((-5.1, -7.5), (-5, -7.5))
        make_face()
    revolve(axis=Axis((0, 0, -5), (0, 0, 1)), revolution_arc=F6_T16_ANGLE)

    split(bisect_by=Plane(origin=(-2.4994024649, -0.0546563653, 0), x_dir=(0, 0, 1), z_dir=(-0.999760986, -0.0218625461, 0)), keep=Keep.TOP)

    split(bisect_by=Plane(origin=(1.2023674317, 2.1918742116, 0), x_dir=(0, 0, 1), z_dir=(0.4809469727, 0.8767496846, 0)), keep=Keep.TOP)


with BuildPart() as f1_4:
    add(f1_3.part)

    # F6_t13: cut F6_tool14
    add(f6_tool14.part, mode=Mode.SUBTRACT)


with BuildPart() as f6_tool20:
    # F6_s21 → F6_t22 (revolve)
    with BuildSketch(Plane(origin=(0, 0, 0), x_dir=(0, 0, 1), z_dir=(0.2505483426, 0.9681040895, 0))):
        with BuildLine():
            ThreePointArc((-5, -7.5), (-3.5355339059, -11.0355339059), (0, -12.5))
            Line((0, -12.5), (0, -12.6))
            Line((0, -12.6), (-5.1, -12.6))
            Line((-5.1, -12.6), (-5.1, -7.5))
            Line((-5.1, -7.5), (-5, -7.5))
        make_face()
    revolve(axis=Axis((0, 0, -5), (0, 0, 1)), revolution_arc=F6_T22_ANGLE)

    split(bisect_by=Plane(origin=(1.2970350333, -2.1372178463, 0), x_dir=(0, 0, 1), z_dir=(0.5188140133, -0.8548871385, 0)), keep=Keep.TOP)

    split(bisect_by=Plane(origin=(-2.4994024649, -0.0546563653, 0), x_dir=(0, 0, 1), z_dir=(-0.999760986, -0.0218625461, 0)), keep=Keep.TOP)


with BuildPart() as f1_5:
    add(f1_4.part)

    # F6_t19: cut F6_tool20
    add(f6_tool20.part, mode=Mode.SUBTRACT)


with BuildPart() as f6_tool26:
    # F6_s27 → F6_t28 (revolve)
    with BuildSketch(Plane(origin=(0, 0, 0), x_dir=(0, 0, 1), z_dir=(-0.7131285637, 0.7010332743, 0))):
        with BuildLine():
            ThreePointArc((-5, -7.5), (-3.5355339059, -11.0355339059), (0, -12.5))
            Line((0, -12.5), (0, -12.6))
            Line((0, -12.6), (-5.1, -12.6))
            Line((-5.1, -12.6), (-5.1, -7.5))
            Line((-5.1, -7.5), (-5, -7.5))
        make_face()
    revolve(axis=Axis((0, 0, -5), (0, 0, 1)), revolution_arc=F6_T28_ANGLE)

    split(bisect_by=Plane(origin=(2.4994024649, 0.0546563653, 0), x_dir=(0, 0, 1), z_dir=(0.999760986, 0.0218625461, 0)), keep=Keep.TOP)

    split(bisect_by=Plane(origin=(-1.2023674317, -2.1918742116, 0), x_dir=(0, 0, 1), z_dir=(-0.4809469727, -0.8767496846, 0)), keep=Keep.TOP)


with BuildPart() as f1_6:
    add(f1_5.part)

    # F6_t25: cut F6_tool26
    add(f6_tool26.part, mode=Mode.SUBTRACT)


with BuildPart() as f6_tool32:
    # F6_s33 → F6_t34 (revolve)
    with BuildSketch(Plane(origin=(0, 0, 0), x_dir=(0, 0, 1), z_dir=(-0.9636769063, -0.2670708152, 0))):
        with BuildLine():
            ThreePointArc((-5, -7.5), (-3.5355339059, -11.0355339059), (0, -12.5))
            Line((0, -12.5), (0, -12.6))
            Line((0, -12.6), (-5.1, -12.6))
            Line((-5.1, -12.6), (-5.1, -7.5))
            Line((-5.1, -7.5), (-5, -7.5))
        make_face()
    revolve(axis=Axis((0, 0, -5), (0, 0, 1)), revolution_arc=F6_T34_ANGLE)

    split(bisect_by=Plane(origin=(1.2023674317, 2.1918742116, 0), x_dir=(0, 0, 1), z_dir=(0.4809469727, 0.8767496846, 0)), keep=Keep.TOP)

    split(bisect_by=Plane(origin=(1.2970350333, -2.1372178463, 0), x_dir=(0, 0, 1), z_dir=(0.5188140133, -0.8548871385, 0)), keep=Keep.TOP)


with BuildPart() as f1_7:
    add(f1_6.part)

    # F6_t31: cut F6_tool32
    add(f6_tool32.part, mode=Mode.SUBTRACT)


solid = f1_7.part
